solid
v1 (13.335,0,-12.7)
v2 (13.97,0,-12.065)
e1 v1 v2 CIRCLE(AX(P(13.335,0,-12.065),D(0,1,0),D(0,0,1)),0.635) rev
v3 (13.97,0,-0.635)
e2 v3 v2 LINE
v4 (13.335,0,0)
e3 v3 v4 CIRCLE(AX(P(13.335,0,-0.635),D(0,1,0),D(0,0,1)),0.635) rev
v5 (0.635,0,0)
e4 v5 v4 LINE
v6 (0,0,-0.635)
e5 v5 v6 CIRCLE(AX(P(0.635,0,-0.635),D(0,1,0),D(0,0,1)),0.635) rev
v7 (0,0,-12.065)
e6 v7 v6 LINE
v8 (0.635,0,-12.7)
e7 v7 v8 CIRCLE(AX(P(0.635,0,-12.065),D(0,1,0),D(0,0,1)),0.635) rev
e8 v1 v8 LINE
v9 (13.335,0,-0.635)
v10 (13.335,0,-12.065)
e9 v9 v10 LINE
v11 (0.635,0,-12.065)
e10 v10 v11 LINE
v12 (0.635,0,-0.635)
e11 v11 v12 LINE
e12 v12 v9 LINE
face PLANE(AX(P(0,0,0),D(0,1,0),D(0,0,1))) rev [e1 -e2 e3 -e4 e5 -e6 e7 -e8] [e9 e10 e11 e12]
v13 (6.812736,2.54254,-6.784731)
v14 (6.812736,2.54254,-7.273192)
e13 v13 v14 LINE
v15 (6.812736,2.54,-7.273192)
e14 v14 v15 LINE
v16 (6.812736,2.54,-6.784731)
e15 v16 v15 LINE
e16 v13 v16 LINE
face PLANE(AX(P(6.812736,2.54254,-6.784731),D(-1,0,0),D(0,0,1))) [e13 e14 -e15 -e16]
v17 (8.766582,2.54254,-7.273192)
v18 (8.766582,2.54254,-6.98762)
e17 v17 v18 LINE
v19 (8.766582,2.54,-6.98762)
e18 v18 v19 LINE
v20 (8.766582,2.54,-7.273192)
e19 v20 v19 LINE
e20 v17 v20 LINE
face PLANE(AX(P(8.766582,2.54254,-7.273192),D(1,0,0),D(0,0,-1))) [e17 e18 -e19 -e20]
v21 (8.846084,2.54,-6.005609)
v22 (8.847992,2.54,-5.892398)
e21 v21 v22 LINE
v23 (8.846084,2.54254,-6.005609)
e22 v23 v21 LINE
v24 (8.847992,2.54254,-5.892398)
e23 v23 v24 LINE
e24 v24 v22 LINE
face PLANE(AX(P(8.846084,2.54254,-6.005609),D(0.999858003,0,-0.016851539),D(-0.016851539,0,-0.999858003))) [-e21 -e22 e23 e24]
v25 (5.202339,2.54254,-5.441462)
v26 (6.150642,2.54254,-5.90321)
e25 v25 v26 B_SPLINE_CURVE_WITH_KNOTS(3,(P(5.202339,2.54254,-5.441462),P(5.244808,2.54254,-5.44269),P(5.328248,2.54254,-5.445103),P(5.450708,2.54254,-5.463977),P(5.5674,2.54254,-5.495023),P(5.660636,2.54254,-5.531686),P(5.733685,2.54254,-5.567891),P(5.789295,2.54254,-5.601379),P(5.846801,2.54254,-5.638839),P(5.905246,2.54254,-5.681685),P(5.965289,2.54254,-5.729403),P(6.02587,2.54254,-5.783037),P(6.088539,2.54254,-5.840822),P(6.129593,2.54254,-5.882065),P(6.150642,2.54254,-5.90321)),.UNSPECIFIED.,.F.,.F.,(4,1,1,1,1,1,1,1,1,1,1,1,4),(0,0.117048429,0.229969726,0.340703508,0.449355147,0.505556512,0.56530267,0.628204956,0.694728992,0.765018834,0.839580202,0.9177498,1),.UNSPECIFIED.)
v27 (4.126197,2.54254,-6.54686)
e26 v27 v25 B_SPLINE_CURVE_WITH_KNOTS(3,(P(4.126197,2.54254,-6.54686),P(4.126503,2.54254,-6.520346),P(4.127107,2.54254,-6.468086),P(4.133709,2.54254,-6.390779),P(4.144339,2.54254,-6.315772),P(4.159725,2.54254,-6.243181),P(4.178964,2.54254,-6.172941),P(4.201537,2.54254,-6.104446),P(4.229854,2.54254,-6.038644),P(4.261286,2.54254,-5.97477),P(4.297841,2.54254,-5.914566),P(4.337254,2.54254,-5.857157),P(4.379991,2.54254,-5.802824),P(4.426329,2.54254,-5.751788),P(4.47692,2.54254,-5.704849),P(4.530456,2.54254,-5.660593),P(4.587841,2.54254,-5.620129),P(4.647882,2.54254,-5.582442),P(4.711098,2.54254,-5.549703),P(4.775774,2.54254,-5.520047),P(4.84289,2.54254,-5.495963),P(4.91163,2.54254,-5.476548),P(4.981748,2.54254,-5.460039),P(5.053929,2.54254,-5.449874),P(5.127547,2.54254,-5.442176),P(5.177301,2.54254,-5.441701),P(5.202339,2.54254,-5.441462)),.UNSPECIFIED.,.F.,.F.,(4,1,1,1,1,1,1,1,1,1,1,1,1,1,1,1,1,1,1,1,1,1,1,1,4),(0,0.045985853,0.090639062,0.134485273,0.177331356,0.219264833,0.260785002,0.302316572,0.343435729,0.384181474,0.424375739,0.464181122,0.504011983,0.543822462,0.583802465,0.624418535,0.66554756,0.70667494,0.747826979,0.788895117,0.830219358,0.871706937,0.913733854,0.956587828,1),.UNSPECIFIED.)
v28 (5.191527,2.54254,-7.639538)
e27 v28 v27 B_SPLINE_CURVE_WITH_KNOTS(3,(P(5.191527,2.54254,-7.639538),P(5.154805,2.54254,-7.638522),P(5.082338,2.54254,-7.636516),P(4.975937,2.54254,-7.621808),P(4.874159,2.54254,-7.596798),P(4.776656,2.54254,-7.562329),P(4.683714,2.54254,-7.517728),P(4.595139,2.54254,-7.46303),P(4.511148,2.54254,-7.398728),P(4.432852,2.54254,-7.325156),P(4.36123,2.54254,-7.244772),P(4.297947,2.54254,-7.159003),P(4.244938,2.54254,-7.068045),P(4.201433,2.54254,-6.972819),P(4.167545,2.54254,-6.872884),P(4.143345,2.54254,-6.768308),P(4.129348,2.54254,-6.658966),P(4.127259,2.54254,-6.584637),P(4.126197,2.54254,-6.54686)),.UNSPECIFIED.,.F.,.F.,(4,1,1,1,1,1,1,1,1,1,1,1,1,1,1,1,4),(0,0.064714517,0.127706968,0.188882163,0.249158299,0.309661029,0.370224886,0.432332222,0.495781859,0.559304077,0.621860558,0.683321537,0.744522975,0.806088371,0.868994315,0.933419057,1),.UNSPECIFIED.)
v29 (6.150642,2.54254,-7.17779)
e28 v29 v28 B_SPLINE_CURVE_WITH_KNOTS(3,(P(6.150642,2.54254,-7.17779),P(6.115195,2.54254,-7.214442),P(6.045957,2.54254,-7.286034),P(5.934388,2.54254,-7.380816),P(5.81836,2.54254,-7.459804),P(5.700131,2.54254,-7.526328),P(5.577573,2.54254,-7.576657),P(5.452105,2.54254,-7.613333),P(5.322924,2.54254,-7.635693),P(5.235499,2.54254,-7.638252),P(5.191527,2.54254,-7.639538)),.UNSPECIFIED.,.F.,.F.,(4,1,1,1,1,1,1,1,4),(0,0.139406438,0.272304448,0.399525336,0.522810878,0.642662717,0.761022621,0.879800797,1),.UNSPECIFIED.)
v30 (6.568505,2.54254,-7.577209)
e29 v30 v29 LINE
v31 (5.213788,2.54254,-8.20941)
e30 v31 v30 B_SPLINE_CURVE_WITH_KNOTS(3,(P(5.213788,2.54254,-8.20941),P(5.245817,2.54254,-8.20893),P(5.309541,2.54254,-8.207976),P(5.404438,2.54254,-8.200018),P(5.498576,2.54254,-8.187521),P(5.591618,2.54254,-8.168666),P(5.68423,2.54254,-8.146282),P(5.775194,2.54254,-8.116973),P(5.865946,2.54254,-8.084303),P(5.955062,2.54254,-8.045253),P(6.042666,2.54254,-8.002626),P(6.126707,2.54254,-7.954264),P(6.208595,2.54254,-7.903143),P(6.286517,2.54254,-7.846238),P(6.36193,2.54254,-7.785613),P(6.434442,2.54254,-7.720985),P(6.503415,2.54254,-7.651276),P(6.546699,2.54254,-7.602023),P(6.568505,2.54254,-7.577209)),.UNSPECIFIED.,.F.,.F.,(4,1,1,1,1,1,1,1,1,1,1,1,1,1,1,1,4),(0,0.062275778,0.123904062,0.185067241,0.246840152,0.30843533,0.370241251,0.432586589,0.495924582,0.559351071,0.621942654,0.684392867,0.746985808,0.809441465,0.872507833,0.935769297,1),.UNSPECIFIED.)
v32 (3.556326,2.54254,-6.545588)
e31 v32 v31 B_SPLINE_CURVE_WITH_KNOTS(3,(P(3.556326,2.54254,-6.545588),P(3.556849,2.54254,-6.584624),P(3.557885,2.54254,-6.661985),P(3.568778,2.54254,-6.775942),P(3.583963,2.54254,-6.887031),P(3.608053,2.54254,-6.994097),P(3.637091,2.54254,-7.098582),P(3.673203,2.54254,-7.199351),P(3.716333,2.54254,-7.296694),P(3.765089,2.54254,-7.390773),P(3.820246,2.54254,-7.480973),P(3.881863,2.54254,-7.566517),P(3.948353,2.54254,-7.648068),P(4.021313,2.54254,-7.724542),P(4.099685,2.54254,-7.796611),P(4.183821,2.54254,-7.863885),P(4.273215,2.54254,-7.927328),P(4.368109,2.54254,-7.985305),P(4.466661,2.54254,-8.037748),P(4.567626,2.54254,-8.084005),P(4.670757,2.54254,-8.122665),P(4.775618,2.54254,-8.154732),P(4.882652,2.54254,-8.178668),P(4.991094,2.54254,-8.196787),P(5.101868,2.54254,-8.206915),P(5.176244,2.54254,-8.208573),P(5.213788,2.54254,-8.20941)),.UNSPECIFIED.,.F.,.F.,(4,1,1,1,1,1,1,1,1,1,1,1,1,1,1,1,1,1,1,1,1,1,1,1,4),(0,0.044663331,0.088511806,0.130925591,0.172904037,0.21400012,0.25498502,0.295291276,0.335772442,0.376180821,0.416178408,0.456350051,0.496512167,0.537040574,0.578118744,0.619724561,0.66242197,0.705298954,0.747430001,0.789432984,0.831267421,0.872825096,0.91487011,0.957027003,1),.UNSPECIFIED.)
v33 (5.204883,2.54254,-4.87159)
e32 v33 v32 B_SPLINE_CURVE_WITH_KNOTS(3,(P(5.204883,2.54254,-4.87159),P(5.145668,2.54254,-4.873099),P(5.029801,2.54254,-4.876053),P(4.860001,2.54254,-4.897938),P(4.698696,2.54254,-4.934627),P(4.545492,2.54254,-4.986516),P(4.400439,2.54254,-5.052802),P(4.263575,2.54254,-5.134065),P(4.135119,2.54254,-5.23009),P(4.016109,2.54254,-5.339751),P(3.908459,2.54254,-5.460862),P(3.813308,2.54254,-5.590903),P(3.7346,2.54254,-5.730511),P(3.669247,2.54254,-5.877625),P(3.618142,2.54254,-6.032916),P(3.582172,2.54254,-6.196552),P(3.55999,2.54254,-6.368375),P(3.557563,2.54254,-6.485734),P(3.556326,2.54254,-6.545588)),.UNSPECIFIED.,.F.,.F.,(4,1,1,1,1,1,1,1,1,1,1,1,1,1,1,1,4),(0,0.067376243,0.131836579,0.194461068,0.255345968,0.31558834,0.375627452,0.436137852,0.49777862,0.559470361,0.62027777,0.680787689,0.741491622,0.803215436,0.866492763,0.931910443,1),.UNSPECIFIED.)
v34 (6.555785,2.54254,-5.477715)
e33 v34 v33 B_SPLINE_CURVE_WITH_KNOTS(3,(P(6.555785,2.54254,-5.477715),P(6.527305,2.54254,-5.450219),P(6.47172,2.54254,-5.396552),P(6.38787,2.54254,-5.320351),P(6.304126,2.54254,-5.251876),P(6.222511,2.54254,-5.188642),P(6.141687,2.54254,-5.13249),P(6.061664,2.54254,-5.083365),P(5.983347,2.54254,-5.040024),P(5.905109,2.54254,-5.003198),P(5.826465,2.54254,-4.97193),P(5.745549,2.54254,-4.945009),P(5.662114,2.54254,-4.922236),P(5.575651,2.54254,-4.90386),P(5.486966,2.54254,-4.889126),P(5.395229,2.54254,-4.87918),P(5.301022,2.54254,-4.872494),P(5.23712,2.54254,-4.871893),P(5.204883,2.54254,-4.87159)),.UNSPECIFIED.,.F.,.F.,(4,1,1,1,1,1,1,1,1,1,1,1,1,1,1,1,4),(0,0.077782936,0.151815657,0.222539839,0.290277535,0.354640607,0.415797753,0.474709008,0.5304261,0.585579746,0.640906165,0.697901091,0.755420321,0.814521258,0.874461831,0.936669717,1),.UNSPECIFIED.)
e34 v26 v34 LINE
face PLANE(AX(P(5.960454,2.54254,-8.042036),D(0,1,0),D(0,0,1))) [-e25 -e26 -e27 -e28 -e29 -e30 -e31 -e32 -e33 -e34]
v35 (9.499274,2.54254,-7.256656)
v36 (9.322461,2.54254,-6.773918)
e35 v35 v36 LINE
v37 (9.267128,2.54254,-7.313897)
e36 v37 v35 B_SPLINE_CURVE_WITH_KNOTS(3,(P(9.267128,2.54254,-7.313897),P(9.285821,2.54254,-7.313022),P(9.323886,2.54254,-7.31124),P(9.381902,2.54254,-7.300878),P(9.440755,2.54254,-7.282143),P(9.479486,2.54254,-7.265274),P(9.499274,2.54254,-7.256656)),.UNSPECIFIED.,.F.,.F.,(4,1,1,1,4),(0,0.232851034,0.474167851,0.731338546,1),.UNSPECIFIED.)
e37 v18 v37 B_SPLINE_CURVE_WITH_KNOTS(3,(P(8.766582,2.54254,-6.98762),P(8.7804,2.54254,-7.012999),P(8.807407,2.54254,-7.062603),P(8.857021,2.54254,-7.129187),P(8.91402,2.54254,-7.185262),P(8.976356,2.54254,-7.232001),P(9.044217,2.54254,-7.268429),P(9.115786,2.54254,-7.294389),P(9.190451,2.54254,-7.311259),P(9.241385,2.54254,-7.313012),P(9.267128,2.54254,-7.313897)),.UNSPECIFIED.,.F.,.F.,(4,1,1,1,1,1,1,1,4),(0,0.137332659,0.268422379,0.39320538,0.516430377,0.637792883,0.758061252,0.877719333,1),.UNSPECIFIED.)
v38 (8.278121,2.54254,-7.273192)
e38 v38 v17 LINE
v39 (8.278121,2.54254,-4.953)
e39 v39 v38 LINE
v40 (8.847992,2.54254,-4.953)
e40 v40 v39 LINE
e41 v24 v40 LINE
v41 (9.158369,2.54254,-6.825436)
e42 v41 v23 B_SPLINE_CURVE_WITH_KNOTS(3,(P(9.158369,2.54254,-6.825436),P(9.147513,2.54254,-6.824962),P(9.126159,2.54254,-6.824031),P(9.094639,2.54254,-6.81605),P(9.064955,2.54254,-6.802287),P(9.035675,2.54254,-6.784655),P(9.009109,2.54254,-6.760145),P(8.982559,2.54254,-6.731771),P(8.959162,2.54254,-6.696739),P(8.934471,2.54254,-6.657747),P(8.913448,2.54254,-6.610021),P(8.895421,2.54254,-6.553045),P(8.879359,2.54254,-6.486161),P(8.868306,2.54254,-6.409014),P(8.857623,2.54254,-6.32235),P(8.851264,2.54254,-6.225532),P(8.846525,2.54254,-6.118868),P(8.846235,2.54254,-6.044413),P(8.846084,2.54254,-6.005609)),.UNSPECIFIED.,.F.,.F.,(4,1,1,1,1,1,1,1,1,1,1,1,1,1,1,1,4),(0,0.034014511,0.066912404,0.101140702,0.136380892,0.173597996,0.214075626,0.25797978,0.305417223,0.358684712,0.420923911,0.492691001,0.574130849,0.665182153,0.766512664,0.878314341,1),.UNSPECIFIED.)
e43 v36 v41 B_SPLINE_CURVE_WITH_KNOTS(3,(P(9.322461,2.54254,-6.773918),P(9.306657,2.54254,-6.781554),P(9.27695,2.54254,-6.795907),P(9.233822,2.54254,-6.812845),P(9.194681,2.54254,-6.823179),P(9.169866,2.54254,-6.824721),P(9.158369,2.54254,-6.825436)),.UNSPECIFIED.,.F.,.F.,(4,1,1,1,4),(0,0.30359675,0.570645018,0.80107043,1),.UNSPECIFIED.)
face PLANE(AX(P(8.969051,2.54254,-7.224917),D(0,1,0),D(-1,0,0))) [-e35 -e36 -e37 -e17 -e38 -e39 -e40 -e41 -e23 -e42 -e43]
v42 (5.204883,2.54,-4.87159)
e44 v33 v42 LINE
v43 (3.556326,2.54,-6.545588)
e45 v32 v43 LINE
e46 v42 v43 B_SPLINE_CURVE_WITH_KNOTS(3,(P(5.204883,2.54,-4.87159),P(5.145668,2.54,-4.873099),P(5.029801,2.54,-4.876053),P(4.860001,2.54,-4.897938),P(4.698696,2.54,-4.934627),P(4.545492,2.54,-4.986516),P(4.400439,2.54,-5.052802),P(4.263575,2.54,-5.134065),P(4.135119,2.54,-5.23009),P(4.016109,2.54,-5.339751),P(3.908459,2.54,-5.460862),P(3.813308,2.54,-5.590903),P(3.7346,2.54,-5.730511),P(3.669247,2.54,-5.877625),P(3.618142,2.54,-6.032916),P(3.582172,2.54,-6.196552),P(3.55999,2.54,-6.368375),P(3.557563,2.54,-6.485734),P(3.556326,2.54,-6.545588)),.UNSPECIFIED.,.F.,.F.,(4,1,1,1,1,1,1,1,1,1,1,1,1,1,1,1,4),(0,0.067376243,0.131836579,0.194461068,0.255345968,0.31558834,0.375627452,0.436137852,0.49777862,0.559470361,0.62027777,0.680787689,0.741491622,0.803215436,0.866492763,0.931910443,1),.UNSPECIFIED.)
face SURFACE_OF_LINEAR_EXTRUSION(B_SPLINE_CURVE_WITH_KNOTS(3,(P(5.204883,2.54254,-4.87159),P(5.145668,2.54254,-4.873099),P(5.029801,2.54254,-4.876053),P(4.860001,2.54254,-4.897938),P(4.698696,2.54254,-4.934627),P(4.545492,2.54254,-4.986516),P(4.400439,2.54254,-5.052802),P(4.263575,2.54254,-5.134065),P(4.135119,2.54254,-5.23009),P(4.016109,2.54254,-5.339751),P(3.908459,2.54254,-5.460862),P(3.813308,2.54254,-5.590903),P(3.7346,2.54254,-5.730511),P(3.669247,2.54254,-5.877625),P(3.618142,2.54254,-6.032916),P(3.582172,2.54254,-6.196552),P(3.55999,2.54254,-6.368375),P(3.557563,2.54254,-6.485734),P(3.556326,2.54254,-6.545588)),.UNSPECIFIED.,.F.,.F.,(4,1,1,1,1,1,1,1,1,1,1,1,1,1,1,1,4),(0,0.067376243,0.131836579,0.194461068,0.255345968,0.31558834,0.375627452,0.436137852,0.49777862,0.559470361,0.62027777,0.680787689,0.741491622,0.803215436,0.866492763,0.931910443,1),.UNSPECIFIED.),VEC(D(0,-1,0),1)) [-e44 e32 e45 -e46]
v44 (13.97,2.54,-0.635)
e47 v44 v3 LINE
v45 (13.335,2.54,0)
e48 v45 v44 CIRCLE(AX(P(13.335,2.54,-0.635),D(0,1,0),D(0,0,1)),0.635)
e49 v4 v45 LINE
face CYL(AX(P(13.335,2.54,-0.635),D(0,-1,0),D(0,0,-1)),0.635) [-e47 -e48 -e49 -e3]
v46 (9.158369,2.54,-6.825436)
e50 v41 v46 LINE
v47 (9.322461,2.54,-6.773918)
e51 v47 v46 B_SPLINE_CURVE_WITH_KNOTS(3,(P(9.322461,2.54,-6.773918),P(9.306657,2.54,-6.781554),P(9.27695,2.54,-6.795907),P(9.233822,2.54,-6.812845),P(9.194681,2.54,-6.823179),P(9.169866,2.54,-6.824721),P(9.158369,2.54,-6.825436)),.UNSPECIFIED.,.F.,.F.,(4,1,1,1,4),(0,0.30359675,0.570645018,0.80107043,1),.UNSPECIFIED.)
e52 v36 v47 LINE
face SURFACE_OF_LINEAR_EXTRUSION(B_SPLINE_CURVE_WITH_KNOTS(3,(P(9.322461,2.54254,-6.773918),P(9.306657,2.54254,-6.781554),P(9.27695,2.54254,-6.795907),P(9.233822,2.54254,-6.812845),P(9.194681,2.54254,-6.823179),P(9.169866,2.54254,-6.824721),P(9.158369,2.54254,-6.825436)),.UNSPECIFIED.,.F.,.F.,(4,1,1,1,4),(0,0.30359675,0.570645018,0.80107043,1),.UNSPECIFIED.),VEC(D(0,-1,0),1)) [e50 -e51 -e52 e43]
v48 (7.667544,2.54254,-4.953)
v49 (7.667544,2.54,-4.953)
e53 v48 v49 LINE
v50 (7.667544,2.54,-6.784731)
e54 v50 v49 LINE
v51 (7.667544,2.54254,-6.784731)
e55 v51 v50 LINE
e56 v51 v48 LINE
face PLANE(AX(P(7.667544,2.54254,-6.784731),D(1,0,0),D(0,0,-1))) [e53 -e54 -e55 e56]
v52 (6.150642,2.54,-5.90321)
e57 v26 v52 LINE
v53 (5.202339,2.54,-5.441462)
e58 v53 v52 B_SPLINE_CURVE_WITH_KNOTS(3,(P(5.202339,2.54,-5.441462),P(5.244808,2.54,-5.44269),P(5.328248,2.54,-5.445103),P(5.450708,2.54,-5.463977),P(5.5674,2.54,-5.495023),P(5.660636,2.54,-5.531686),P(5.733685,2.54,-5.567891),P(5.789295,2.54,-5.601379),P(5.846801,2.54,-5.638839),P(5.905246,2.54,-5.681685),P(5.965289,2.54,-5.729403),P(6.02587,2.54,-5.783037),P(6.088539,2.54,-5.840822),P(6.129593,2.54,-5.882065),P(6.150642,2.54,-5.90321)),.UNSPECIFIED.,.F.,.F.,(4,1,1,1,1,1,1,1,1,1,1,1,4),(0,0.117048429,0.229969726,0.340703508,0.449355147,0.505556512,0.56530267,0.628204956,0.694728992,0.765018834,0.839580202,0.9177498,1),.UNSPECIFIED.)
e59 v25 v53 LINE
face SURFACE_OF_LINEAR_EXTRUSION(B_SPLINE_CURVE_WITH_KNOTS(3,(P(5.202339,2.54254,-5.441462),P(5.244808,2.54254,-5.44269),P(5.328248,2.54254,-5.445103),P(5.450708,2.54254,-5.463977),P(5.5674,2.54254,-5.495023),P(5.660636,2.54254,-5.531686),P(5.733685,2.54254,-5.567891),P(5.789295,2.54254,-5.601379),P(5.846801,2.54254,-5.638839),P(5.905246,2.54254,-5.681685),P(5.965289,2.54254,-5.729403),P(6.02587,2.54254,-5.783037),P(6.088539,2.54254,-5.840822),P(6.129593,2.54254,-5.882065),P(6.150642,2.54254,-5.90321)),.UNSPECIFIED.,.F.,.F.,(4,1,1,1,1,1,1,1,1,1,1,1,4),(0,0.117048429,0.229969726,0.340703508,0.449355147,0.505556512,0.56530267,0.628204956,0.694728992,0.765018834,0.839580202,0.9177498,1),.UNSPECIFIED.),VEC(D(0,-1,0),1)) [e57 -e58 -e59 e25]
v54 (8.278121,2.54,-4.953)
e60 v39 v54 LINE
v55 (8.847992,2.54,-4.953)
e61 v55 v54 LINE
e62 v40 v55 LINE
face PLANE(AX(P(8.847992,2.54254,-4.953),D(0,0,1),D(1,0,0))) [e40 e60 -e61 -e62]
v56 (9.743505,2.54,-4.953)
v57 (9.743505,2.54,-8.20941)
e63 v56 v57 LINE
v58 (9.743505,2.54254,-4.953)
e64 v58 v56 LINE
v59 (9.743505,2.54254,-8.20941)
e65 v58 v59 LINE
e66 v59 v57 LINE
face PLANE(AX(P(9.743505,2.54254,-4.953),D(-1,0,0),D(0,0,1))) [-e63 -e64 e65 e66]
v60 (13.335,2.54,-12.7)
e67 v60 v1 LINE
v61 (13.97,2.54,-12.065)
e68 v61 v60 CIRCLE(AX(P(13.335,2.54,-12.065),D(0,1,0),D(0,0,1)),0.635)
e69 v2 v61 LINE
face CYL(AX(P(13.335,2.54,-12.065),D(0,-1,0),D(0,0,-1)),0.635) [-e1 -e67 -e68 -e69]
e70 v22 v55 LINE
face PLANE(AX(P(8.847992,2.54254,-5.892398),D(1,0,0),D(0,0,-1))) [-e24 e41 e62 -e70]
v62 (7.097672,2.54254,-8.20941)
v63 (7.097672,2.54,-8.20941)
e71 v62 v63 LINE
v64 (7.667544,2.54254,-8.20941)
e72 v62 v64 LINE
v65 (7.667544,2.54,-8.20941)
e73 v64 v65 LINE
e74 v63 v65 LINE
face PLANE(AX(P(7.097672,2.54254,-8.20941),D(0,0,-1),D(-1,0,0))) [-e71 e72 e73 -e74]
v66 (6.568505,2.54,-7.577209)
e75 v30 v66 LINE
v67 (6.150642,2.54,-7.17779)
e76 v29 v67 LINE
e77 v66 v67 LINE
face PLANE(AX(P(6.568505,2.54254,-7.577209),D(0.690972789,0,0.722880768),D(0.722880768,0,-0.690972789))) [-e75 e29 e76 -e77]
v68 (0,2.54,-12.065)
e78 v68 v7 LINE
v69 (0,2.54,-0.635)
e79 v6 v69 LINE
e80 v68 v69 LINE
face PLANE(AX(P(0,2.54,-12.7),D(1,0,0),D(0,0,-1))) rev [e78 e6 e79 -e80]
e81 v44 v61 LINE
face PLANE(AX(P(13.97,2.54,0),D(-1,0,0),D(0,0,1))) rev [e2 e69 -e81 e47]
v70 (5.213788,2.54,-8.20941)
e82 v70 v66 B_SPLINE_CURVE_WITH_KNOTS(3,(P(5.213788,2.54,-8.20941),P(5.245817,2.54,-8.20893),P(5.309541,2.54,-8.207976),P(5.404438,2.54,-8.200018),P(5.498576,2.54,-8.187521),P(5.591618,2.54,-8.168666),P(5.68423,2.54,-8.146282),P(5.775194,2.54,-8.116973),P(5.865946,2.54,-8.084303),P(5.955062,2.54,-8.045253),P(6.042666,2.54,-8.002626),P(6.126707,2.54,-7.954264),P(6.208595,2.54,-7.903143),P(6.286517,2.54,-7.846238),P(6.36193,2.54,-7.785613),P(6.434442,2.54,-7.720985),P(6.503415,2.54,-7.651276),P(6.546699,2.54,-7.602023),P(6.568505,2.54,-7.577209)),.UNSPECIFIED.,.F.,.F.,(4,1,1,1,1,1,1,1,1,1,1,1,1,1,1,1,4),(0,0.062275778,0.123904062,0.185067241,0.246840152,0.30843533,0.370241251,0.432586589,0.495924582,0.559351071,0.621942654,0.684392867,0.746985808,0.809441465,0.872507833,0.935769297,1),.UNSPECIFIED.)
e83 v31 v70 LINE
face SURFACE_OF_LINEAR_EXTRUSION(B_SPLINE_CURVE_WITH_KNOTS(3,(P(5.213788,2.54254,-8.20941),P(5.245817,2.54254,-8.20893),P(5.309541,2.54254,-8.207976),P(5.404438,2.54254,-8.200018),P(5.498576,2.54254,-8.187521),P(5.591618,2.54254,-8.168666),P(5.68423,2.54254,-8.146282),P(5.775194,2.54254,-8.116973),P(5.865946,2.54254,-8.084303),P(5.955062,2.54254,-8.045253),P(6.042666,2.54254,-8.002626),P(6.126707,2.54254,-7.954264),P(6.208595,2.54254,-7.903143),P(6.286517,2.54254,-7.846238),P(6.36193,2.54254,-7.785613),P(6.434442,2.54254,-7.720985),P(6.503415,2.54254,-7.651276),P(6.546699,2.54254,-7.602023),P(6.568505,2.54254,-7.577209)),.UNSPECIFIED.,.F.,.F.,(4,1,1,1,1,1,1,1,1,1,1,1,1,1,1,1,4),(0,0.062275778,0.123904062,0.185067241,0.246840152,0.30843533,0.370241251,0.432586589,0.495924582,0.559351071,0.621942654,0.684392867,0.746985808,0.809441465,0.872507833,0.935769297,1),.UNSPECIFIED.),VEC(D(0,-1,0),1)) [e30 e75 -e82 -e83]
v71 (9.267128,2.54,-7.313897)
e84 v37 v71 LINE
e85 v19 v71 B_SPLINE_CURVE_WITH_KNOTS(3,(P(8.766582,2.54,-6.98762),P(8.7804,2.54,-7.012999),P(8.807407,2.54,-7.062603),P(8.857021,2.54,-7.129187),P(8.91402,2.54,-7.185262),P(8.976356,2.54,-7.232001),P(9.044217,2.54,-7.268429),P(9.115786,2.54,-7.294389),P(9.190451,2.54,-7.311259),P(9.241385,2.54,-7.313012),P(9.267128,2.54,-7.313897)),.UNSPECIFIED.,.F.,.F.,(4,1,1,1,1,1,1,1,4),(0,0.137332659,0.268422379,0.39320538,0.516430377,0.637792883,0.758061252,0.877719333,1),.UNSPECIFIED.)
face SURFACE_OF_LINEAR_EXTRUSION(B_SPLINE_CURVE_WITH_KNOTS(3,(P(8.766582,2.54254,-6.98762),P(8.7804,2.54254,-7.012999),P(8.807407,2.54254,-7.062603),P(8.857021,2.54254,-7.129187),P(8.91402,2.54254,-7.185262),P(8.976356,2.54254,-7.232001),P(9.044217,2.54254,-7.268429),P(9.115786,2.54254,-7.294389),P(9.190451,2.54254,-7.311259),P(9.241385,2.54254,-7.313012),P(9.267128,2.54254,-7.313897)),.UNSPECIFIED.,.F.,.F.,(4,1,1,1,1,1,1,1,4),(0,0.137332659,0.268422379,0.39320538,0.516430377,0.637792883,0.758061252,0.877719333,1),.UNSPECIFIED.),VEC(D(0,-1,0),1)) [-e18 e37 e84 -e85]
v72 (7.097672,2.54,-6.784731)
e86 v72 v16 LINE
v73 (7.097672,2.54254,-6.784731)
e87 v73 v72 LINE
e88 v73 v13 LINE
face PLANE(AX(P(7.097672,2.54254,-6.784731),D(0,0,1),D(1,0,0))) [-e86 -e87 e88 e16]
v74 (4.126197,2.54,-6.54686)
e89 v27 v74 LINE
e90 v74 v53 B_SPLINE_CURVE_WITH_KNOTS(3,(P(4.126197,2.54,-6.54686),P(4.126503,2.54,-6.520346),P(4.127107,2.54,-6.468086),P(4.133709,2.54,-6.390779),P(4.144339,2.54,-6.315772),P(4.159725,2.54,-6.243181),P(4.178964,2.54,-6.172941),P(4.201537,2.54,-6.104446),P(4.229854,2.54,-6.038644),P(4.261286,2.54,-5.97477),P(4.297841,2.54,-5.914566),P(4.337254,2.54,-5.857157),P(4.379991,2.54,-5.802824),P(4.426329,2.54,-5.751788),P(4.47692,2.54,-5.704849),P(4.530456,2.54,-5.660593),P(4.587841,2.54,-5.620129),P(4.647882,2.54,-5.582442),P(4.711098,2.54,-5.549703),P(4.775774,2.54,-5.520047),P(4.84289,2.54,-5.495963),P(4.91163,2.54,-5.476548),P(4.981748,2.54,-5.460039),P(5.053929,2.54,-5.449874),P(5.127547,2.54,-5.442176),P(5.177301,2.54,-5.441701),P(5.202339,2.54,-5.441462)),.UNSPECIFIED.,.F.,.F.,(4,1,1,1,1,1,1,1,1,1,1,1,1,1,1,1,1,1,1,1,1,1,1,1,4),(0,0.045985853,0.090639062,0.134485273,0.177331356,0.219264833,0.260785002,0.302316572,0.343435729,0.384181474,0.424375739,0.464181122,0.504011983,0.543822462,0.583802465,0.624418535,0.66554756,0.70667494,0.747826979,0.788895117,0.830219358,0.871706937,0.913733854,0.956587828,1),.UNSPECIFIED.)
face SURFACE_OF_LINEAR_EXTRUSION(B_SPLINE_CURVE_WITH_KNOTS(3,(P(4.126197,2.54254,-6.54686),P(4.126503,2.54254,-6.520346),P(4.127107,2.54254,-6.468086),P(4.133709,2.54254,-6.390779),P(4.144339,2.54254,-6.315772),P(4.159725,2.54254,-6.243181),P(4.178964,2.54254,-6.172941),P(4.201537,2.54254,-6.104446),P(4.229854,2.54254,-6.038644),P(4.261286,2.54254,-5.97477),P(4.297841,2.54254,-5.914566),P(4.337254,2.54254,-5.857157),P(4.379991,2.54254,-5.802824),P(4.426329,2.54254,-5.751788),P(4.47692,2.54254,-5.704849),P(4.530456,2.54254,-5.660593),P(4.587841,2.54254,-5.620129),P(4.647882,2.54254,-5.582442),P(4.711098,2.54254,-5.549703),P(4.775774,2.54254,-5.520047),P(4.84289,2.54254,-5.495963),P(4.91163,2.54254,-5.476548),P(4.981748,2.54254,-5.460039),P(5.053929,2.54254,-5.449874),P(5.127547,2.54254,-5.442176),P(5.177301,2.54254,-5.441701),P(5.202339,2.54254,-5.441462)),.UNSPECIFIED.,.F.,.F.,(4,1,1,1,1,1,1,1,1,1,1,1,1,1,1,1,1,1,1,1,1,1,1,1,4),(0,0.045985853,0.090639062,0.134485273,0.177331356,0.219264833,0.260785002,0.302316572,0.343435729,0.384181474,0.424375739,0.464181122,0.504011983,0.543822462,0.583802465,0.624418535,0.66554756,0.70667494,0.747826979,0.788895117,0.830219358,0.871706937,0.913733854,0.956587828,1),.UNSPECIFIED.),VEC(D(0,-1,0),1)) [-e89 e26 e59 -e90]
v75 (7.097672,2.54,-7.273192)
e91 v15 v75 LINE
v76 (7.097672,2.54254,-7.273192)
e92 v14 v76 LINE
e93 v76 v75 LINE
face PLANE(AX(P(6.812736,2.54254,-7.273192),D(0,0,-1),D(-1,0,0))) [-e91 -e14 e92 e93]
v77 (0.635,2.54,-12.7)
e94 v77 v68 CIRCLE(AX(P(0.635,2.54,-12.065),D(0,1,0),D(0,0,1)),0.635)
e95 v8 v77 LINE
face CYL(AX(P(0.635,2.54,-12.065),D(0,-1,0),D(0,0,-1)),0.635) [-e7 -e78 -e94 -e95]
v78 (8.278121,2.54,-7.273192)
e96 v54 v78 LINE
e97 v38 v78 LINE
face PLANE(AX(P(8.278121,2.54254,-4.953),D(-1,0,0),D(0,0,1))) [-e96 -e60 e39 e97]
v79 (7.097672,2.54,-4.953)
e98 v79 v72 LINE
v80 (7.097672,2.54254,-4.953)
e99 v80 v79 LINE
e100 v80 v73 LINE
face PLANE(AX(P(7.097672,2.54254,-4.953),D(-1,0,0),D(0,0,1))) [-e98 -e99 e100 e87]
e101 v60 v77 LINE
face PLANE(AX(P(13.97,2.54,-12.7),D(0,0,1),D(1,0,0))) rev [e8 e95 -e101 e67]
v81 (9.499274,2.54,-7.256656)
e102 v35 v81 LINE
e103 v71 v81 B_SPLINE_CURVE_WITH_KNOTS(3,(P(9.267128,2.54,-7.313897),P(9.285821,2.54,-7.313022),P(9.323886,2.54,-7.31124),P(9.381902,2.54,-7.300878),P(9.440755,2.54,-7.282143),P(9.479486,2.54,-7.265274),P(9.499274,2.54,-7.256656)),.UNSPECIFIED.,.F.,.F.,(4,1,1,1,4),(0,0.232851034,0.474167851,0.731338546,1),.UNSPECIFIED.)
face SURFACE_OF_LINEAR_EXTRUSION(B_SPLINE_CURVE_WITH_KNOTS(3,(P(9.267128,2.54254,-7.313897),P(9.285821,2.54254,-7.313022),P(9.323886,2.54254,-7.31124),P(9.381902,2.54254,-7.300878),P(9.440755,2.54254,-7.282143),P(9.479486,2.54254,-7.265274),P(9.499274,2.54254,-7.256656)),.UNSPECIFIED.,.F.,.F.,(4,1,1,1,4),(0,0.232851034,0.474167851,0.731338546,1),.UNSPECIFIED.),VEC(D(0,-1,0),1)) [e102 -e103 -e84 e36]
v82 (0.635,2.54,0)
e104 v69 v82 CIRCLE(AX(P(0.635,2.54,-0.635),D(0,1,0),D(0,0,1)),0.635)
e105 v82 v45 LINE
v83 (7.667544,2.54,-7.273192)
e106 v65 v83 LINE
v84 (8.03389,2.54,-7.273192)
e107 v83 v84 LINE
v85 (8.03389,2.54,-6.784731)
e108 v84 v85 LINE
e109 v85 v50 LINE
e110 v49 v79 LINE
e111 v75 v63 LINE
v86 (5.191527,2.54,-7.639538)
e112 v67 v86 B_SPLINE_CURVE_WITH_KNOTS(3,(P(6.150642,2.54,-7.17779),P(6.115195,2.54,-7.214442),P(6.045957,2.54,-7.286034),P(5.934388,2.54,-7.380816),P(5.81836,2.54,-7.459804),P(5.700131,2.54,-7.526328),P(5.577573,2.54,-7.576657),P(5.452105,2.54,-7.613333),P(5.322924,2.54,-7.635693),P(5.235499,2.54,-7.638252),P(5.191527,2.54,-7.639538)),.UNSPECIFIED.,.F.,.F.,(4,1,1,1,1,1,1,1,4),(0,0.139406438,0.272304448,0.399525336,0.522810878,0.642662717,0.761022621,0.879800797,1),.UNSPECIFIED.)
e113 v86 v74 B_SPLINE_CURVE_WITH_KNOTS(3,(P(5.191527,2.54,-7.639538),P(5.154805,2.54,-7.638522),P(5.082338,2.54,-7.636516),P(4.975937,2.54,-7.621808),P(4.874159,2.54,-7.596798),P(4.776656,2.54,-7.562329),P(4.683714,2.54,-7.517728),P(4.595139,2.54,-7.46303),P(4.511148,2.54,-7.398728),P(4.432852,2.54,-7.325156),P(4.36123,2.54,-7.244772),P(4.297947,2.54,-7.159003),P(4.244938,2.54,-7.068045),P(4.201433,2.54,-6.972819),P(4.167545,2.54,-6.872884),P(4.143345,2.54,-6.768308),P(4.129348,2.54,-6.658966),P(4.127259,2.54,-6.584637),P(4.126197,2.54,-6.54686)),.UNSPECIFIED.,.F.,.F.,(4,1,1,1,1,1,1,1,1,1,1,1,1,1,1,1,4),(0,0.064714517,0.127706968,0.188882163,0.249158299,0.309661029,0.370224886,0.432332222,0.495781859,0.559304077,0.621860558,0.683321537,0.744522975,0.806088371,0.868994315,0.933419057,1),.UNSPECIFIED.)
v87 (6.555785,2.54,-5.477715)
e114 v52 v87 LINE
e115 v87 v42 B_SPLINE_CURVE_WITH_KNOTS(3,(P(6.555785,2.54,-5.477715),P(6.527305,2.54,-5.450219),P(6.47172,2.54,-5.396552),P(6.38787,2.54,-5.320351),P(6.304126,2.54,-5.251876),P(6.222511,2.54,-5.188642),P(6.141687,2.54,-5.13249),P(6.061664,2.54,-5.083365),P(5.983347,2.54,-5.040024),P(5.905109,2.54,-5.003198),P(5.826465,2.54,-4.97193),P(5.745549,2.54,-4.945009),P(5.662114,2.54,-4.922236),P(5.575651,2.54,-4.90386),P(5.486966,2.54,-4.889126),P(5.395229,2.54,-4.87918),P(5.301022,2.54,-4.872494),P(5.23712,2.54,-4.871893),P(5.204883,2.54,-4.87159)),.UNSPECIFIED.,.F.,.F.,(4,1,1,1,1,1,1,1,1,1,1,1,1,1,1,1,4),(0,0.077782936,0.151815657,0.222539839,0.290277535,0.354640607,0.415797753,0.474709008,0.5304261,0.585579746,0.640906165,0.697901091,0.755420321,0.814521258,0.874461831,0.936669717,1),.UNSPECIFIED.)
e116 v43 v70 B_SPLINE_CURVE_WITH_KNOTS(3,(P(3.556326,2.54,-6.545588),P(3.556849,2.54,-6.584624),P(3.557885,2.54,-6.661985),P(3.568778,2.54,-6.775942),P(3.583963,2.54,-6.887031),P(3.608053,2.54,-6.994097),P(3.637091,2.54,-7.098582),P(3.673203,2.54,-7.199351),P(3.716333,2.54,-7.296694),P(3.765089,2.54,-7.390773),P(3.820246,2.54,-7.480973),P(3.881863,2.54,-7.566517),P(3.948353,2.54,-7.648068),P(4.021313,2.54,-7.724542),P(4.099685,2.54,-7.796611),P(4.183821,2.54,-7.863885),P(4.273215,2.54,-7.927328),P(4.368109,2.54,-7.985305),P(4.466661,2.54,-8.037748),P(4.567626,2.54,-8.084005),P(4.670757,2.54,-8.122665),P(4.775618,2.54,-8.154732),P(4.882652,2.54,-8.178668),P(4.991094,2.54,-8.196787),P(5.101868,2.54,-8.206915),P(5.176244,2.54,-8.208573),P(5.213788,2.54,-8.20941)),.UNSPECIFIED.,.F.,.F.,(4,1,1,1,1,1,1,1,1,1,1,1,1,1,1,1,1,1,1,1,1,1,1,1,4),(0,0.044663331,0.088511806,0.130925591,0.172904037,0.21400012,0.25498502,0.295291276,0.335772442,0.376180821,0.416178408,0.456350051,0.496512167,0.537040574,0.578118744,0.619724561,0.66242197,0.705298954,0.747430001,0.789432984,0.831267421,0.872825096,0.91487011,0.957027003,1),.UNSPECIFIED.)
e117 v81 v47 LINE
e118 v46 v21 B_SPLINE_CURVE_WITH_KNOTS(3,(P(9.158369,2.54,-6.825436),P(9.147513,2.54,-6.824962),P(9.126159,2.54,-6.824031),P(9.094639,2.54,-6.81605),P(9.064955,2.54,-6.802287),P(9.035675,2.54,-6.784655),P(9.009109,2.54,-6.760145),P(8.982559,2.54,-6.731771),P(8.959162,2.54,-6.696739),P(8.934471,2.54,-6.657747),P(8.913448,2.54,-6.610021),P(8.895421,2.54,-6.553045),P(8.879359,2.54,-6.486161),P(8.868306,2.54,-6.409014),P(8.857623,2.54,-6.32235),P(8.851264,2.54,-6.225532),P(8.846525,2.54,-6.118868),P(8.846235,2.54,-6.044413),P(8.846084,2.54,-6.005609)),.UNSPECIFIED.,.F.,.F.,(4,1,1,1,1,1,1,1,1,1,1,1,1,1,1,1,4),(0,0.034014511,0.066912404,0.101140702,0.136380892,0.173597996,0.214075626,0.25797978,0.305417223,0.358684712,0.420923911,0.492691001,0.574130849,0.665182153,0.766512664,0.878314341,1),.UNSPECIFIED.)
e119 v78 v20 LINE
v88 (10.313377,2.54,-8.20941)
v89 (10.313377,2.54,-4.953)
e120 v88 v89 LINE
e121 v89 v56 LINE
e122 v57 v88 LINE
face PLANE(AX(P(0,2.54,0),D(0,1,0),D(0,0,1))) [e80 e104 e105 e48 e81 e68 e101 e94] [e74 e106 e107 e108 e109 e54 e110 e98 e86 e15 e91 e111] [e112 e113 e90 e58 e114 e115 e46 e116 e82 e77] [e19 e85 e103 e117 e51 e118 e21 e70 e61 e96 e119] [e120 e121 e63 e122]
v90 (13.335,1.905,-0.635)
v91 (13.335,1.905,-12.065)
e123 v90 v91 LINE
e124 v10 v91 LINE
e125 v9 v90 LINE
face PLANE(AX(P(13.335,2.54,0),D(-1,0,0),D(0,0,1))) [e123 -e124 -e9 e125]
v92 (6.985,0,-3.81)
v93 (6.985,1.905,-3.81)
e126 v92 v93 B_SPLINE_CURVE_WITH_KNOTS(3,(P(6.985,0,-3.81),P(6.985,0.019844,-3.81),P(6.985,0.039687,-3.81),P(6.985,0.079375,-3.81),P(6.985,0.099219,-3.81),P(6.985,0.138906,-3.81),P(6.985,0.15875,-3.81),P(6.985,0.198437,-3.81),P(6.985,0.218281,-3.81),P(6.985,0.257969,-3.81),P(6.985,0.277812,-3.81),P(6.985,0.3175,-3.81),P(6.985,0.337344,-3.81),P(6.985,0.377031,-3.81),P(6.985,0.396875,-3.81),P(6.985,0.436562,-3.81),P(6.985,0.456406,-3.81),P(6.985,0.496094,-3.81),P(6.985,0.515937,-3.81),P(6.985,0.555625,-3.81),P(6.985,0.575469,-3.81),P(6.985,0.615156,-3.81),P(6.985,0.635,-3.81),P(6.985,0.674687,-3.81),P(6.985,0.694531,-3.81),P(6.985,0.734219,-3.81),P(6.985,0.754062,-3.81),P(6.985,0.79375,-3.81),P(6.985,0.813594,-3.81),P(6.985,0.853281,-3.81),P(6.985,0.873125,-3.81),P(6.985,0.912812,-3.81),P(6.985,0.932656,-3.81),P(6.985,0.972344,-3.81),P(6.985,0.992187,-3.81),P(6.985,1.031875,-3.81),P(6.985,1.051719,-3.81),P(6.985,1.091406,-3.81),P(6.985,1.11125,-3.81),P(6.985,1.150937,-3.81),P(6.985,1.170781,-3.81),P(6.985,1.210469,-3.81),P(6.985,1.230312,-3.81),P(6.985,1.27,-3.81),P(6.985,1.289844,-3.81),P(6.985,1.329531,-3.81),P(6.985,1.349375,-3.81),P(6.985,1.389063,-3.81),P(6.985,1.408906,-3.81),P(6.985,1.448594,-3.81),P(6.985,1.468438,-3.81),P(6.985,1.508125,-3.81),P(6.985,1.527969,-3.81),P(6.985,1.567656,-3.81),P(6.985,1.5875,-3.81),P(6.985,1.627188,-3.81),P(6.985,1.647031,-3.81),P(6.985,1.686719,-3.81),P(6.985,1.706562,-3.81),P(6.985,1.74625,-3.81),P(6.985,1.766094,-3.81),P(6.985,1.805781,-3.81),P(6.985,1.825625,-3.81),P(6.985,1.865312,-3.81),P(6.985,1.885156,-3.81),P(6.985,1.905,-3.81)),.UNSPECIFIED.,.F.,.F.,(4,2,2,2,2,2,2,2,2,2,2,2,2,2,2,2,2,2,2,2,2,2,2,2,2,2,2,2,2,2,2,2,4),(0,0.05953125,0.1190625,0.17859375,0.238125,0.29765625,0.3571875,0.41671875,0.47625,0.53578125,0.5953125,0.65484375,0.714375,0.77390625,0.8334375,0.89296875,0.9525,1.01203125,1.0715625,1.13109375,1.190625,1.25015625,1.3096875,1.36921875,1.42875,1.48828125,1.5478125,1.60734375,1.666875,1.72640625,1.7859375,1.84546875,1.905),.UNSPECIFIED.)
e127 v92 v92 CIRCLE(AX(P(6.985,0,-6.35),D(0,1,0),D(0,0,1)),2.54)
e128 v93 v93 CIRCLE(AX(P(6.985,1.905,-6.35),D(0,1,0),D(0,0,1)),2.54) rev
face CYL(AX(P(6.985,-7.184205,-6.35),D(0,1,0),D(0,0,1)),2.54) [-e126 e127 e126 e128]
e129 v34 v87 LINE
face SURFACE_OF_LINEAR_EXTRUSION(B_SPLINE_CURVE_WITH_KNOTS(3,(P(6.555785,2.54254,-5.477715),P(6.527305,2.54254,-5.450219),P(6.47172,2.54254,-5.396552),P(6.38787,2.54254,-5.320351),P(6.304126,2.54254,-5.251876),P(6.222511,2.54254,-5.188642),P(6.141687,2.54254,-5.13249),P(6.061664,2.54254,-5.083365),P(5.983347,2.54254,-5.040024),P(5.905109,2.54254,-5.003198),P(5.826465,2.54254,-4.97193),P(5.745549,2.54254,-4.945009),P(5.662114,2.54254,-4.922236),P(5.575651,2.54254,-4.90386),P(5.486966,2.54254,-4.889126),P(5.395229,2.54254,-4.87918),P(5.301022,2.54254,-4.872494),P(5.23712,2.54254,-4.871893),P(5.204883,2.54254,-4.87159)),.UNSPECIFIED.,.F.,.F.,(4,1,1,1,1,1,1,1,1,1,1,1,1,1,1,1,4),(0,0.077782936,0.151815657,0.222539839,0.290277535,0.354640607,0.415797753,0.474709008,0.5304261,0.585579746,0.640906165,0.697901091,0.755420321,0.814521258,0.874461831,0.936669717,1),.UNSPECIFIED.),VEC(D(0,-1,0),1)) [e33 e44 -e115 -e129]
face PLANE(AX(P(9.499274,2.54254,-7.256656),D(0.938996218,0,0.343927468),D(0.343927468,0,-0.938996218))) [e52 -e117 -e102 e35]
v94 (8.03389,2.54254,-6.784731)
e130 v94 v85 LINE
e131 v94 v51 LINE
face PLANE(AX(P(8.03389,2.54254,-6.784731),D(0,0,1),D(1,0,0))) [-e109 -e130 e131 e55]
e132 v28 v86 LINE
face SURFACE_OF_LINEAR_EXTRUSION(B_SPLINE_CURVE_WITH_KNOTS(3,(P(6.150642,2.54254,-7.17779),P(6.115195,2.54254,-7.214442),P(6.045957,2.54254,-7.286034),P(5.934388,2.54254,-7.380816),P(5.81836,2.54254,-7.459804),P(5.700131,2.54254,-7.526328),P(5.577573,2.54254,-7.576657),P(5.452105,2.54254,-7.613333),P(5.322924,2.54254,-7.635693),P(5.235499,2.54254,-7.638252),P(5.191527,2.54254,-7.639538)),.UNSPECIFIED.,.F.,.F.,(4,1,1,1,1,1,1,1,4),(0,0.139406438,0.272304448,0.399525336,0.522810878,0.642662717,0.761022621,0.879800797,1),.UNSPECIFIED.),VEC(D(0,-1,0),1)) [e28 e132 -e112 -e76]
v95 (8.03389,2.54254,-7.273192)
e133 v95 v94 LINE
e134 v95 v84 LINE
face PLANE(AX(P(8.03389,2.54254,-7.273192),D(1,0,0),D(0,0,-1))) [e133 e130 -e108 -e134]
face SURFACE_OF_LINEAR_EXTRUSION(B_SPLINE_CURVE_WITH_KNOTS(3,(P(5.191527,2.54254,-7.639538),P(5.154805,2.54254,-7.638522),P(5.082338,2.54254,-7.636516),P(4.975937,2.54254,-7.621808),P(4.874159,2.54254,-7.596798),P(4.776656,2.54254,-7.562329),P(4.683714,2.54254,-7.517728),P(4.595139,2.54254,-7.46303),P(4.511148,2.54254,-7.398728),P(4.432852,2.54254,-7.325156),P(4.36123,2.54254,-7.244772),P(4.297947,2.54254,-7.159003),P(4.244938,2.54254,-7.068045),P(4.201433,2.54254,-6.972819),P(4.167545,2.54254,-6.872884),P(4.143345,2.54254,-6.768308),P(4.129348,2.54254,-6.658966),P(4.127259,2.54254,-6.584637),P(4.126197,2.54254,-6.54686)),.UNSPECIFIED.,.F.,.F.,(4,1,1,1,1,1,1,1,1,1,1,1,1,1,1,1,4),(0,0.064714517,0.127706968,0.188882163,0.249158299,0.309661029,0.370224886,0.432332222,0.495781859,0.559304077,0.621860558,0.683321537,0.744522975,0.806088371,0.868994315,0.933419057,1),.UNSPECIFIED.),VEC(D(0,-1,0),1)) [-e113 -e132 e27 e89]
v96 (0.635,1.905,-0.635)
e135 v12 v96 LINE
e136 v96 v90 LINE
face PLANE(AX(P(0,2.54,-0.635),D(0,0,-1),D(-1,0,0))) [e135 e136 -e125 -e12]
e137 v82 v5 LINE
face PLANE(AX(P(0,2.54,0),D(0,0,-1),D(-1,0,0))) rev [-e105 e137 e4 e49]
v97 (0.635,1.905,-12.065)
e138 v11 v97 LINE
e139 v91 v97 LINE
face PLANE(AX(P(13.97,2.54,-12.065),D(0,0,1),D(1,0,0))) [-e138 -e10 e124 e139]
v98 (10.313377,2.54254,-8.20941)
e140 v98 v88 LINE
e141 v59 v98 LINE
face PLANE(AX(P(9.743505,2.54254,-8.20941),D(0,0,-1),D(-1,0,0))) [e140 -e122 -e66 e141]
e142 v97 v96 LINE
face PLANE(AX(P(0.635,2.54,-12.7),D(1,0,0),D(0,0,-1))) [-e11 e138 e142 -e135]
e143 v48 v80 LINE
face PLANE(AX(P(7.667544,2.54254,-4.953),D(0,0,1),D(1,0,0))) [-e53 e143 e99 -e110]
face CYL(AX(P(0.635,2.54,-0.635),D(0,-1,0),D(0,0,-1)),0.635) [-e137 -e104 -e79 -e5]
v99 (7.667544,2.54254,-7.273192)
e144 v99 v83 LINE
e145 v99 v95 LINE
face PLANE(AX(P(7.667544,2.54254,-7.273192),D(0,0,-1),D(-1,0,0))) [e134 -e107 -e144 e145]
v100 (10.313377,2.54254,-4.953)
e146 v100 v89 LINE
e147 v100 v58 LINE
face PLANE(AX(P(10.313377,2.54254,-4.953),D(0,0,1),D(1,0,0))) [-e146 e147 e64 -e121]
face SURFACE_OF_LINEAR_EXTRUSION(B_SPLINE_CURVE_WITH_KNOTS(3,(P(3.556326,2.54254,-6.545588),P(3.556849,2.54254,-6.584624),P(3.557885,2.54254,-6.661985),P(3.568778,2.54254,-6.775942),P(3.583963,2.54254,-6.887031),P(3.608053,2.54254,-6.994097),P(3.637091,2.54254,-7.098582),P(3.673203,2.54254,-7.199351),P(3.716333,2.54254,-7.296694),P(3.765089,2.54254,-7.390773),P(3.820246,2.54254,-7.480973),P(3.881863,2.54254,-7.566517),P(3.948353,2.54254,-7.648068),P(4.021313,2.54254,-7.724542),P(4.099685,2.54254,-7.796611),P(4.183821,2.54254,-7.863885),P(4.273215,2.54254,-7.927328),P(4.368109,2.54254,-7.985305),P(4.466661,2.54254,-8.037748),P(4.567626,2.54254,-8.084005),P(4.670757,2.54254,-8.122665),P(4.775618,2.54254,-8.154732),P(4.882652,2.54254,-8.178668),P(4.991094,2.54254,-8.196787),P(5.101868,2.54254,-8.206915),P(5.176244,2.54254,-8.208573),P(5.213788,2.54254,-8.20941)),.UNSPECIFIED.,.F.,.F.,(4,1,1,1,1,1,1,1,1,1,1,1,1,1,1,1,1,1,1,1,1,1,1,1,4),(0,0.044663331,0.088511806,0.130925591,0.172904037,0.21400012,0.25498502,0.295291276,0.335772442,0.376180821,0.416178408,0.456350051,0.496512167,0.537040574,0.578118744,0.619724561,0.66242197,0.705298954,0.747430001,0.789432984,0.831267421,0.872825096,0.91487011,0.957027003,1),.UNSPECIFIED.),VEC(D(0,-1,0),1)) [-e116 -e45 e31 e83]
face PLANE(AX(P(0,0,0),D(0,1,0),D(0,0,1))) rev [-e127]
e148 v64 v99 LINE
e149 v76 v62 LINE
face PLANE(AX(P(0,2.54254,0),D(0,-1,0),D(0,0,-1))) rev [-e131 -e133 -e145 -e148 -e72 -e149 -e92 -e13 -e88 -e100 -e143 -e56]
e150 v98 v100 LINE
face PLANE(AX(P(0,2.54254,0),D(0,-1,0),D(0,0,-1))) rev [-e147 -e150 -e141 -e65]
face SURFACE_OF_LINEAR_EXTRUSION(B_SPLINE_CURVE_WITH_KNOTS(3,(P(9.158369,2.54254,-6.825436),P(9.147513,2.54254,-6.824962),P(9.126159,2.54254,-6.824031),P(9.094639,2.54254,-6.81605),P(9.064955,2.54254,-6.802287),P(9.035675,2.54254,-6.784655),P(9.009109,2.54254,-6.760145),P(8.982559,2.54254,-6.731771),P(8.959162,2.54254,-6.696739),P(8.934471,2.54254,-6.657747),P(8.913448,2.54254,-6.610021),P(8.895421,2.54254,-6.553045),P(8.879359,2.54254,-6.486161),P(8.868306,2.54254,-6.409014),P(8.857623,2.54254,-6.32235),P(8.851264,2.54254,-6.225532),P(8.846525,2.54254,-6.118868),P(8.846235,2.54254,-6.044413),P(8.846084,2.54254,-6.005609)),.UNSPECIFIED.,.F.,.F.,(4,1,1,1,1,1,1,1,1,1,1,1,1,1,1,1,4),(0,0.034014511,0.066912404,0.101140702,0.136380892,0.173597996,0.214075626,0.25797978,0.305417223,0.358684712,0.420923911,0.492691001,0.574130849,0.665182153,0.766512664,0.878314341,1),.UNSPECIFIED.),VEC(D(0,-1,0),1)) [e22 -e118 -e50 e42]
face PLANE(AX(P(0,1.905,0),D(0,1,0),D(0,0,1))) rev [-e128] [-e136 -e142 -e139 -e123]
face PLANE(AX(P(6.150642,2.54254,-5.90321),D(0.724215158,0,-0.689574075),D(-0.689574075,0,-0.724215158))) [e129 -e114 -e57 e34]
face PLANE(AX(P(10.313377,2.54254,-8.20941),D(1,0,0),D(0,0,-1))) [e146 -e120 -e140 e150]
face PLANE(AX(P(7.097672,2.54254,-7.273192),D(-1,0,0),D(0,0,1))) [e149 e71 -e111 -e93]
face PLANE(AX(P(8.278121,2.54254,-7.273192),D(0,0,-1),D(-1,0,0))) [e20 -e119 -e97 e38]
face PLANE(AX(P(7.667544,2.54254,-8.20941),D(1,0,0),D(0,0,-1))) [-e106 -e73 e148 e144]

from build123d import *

# Parameters (mm, degrees)
SKETCH1_W           = 13.97
SKETCH1_H           = 12.7
BOSS_EXTRUDE1_DEPTH = 2.54
FILLET1_R           = 0.635
SHELL1_START        = 0.635
SHELL1_OUTLINE_W    = 1.905
SHELL1_OUTLINE_H    = 11.43
SHELL1_DEPTH        = 12.7
SKETCH2_R           = 2.54
BOSS_EXTRUDE2_DEPTH = 1.905
SKETCH3_W           = 0.569871795
SKETCH3_H           = 3.256410256
BOSS_EXTRUDE3_DEPTH = 0.00254


# Read off the part's stored shape, not the designer's step: Shell1
with BuildPart() as part:
    # Sketch1 → Boss-Extrude1 (new body)
    with BuildSketch(Plane(origin=(0, 0, 0), x_dir=(1, 0, 0), z_dir=(0, 1, 0))):
        with Locations((6.985, 6.35)):
            Rectangle(SKETCH1_W, SKETCH1_H)
    extrude(amount=BOSS_EXTRUDE1_DEPTH)

    # Fillet1
    fillet1_edges = [part.edges().sort_by_distance(p)[0] for p in [
        (0, 1.27, -12.7),
        (13.97, 1.27, -12.7),
        (13.97, 1.27, 0),
        (0, 1.27, 0),
    ]]
    fillet(fillet1_edges, radius=FILLET1_R)

    # Shell1 outline → Shell1 (cut)
    with BuildSketch(Plane.YZ.offset(SHELL1_START)):
        with Locations((0.9525, -6.35)):
            Rectangle(SHELL1_OUTLINE_W, SHELL1_OUTLINE_H)
    extrude(amount=SHELL1_DEPTH, mode=Mode.SUBTRACT)

    # Sketch2 → Boss-Extrude2 (add)
    with BuildSketch(Plane(origin=(0, 1.905, 0), x_dir=(-1, 0, 0), z_dir=(0, -1, 0))):
        with Locations(Location((-6.985, 6.35, 0), (0, 0, 270))):
            Circle(SKETCH2_R)
    extrude(amount=BOSS_EXTRUDE2_DEPTH)

    # Sketch3 → Boss-Extrude3 (add)
    with BuildSketch(Plane(origin=(0, 2.54, 0), x_dir=(1, 0, 0), z_dir=(0, 1, 0))):
        with BuildLine():
            Line((6.568505128, 7.577208734), (6.150641546, 7.177789663))
            add(Edge.make_bspline(
                [(6.150641546, 7.177789663), (6.115194953, 7.2144415), (6.045956652, 7.28603402), (5.934387691, 7.380816208), (5.818360035, 7.459804336), (5.700130769, 7.526327635), (5.577573291, 7.576657252), (5.452104701, 7.613333291), (5.322923843, 7.635693286), (5.235499207, 7.638251666), (5.191526963, 7.639538462)],
                knots=[0, 0, 0, 0, 1.115251505, 2.178435587, 3.19620269, 4.182487026, 5.141301733, 6.088180966, 7.038406374, 8, 8, 8, 8], degree=3))
            add(Edge.make_bspline(
                [(5.191526963, 7.639538462), (5.154804796, 7.638521848), (5.082337645, 7.636515672), (4.975936877, 7.621808428), (4.874159044, 7.596798119), (4.776655743, 7.562329281), (4.683713883, 7.517728433), (4.5951386, 7.463030097), (4.511148271, 7.398728275), (4.432852361, 7.325155668), (4.361230014, 7.244772066), (4.29794711, 7.159002955), (4.244937527, 7.068044826), (4.201433425, 6.972818837), (4.16754541, 6.872884235), (4.143345111, 6.7683083), (4.129348304, 6.658966489), (4.127259187, 6.584636741), (4.126197436, 6.546860176)],
                knots=[0, 0, 0, 0, 1.035432265, 2.043311493, 3.022114605, 3.98653278, 4.95457646, 5.923598177, 6.917315552, 7.932509744, 8.948865224, 9.949768934, 10.933144597, 11.912367597, 12.897413939, 13.903909035, 14.934704909, 16, 16, 16, 16], degree=3))
            add(Edge.make_bspline(
                [(4.126197436, 6.546860176), (4.12650342, 6.52034594), (4.127106522, 6.468085836), (4.133708537, 6.390778637), (4.144339337, 6.315772378), (4.159724739, 6.243180674), (4.178964335, 6.172940615), (4.201536762, 6.104446244), (4.229853539, 6.038643999), (4.26128559, 5.974769629), (4.297840702, 5.914566028), (4.337253857, 5.857156898), (4.379990988, 5.802823652), (4.426328908, 5.751788408), (4.476919763, 5.704848731), (4.530455968, 5.660593089), (4.587840605, 5.620129351), (4.647881648, 5.582442035), (4.711097778, 5.549702743), (4.775773793, 5.52004727), (4.842890313, 5.495962616), (4.911630153, 5.476548188), (4.981747662, 5.460039117), (5.053928654, 5.449873974), (5.12754741, 5.442176031), (5.177301332, 5.441700728), (5.202339263, 5.441461538)],
                knots=[0, 0, 0, 0, 1.103660481, 2.175337485, 3.227646561, 4.255952547, 5.262355991, 6.258840057, 7.255597736, 8.242457506, 9.22035537, 10.185017736, 11.140346927, 12.096287581, 13.051739095, 14.01125915, 14.986044842, 15.97314143, 16.960198552, 17.947847494, 18.933482797, 19.925264591, 20.920966487, 21.929612487, 22.958107872, 24, 24, 24, 24], degree=3))
            add(Edge.make_bspline(
                [(5.202339263, 5.441461538), (5.244807897, 5.442689957), (5.328247719, 5.445103479), (5.450707656, 5.463976883), (5.567399775, 5.495022564), (5.66063622, 5.53168571), (5.733684512, 5.567891042), (5.789295097, 5.601379191), (5.846800776, 5.638839363), (5.905246429, 5.681685345), (5.965289454, 5.729402968), (6.025869952, 5.783037337), (6.088538796, 5.840822348), (6.129592535, 5.882064647), (6.150641546, 5.903210337)],
                knots=[0, 0, 0, 0, 1.404581149, 2.759636711, 4.088442092, 5.392261763, 6.066678138, 6.783632037, 7.538459478, 8.336747902, 9.180226004, 10.074962426, 11.012997595, 12, 12, 12, 12], degree=3))
            Line((6.150641546, 5.903210337), (6.555784776, 5.477714543))
            add(Edge.make_bspline(
                [(6.555784776, 5.477714543), (6.527305387, 5.450218588), (6.471719712, 5.396552363), (6.387870264, 5.320351332), (6.304126343, 5.251876235), (6.222511029, 5.188641725), (6.141687378, 5.132489979), (6.06166396, 5.083364915), (5.983346676, 5.04002409), (5.905109243, 5.003198427), (5.826464826, 4.971929614), (5.745548963, 4.945009219), (5.662114287, 4.922235533), (5.575651216, 4.903860159), (5.486966225, 4.88912559), (5.395229341, 4.879179841), (5.301022221, 4.872493645), (5.237120072, 4.871892834), (5.204883333, 4.871589744)],
                knots=[0, 0, 0, 0, 1.244526981, 2.429050516, 3.560637417, 4.644440555, 5.67424972, 6.652764056, 7.595344123, 8.486817594, 9.369275933, 10.254498637, 11.166417451, 12.086725134, 13.032340136, 13.991389299, 14.986715468, 16, 16, 16, 16], degree=3))
            add(Edge.make_bspline(
                [(5.204883333, 4.871589744), (5.145668437, 4.873099249), (5.029801344, 4.876052933), (4.86000114, 4.897937726), (4.698695505, 4.934627196), (4.545492012, 4.986516227), (4.400439375, 5.052802032), (4.263574704, 5.134065316), (4.135118595, 5.230090176), (4.016108719, 5.339751107), (3.908458622, 5.460862399), (3.813308403, 5.590902701), (3.734600139, 5.730511114), (3.669246971, 5.877625175), (3.618141653, 6.032916222), (3.582172173, 6.196552234), (3.559990057, 6.36837521), (3.557563302, 6.485734263), (3.556325641, 6.545588141)],
                knots=[0, 0, 0, 0, 1.078019885, 2.10938526, 3.111377082, 4.085535484, 5.04941344, 6.010039228, 6.978205633, 7.964457913, 8.951525778, 9.924444315, 10.892603023, 11.863865945, 12.85144698, 13.863884204, 14.910567087, 16, 16, 16, 16], degree=3))
            add(Edge.make_bspline(
                [(3.556325641, 6.545588141), (3.556848616, 6.58462433), (3.557885026, 6.661984515), (3.568777786, 6.775942336), (3.583962928, 6.887030827), (3.608052774, 6.994096523), (3.637090707, 7.098581794), (3.673203193, 7.199351009), (3.716332553, 7.296693788), (3.765088628, 7.390773089), (3.820245888, 7.480972592), (3.881862603, 7.56651734), (3.948352517, 7.648067724), (4.021313276, 7.724541827), (4.099684664, 7.796611105), (4.183820519, 7.863885002), (4.273214805, 7.927328301), (4.36810948, 7.985304953), (4.466660994, 8.037747916), (4.567626351, 8.08400485), (4.670757492, 8.122664994), (4.775618369, 8.154732158), (4.882652019, 8.178668028), (4.991094461, 8.19678671), (5.101868412, 8.206915169), (5.176243523, 8.208573262), (5.21378758, 8.209410256)],
                knots=[0, 0, 0, 0, 1.071919942, 2.124283339, 3.142214191, 4.149696895, 5.136002878, 6.119640489, 7.086990633, 8.058538607, 9.028339693, 9.988281803, 10.952401235, 11.916291999, 12.888973767, 13.874849856, 14.873389453, 15.898127285, 16.927174885, 17.938320013, 18.946391617, 19.950418109, 20.947802303, 21.956882652, 22.968648068, 24, 24, 24, 24], degree=3))
            add(Edge.make_bspline(
                [(5.21378758, 8.209410256), (5.24581651, 8.20893047), (5.309541359, 8.207975887), (5.404438353, 8.200018393), (5.498576405, 8.187521229), (5.591618472, 8.168665671), (5.684230086, 8.14628174), (5.775194226, 8.11697307), (5.865945903, 8.084303034), (5.955061809, 8.045252678), (6.042666337, 8.002625686), (6.126707215, 7.954263816), (6.20859548, 7.903143202), (6.286516537, 7.846238304), (6.361930016, 7.785613168), (6.434441572, 7.720984943), (6.503414876, 7.651276087), (6.546698691, 7.602022665), (6.568505128, 7.577208734)],
                knots=[0, 0, 0, 0, 0.996412454, 1.982464992, 2.961075852, 3.949442424, 4.934965278, 5.923860011, 6.921385422, 7.934793307, 8.949617135, 9.951082467, 10.950285876, 11.951772932, 12.951063433, 13.960125323, 14.972308753, 16, 16, 16, 16], degree=3))
        make_face()
        Polygon((7.097671795, 8.209410256), (7.66754359, 8.209410256), (7.66754359, 7.273192308), (8.033889744, 7.273192308), (8.033889744, 6.784730769), (7.66754359, 6.784730769), (7.66754359, 4.953), (7.097671795, 4.953), (7.097671795, 6.784730769), (6.812735897, 6.784730769), (6.812735897, 7.273192308), (7.097671795, 7.273192308), align=None)
        with BuildLine():
            Line((8.278120513, 7.273192308), (8.766582051, 7.273192308))
            Line((8.766582051, 7.273192308), (8.766582051, 6.987620393))
            add(Edge.make_bspline(
                [(8.766582051, 6.987620393), (8.78039969, 7.012999247), (8.80740684, 7.062603272), (8.857021237, 7.129186851), (8.914020267, 7.185261684), (8.976355778, 7.232000626), (9.044216695, 7.268429043), (9.115785825, 7.294388882), (9.190450896, 7.31125918), (9.241384876, 7.313011685), (9.267127925, 7.313897436)],
                knots=[0, 0, 0, 0, 1.09866127, 2.147379032, 3.14564304, 4.131443017, 5.102343063, 6.064490016, 7.021754664, 8, 8, 8, 8], degree=3))
            add(Edge.make_bspline(
                [(9.267127925, 7.313897436), (9.28582059, 7.313022129), (9.323885533, 7.311239691), (9.381901861, 7.300878355), (9.440755263, 7.282143087), (9.479485873, 7.265274469), (9.499274359, 7.256655849)],
                knots=[0, 0, 0, 0, 0.931404136, 1.896671404, 2.925354185, 4, 4, 4, 4], degree=3))
            Line((9.499274359, 7.256655849), (9.322461458, 6.77391847))
            add(Edge.make_bspline(
                [(9.322461458, 6.77391847), (9.30665691, 6.781554463), (9.276950443, 6.795907192), (9.233821811, 6.81284489), (9.194680789, 6.823179446), (9.1698661, 6.824721452), (9.15836891, 6.825435897)],
                knots=[0, 0, 0, 0, 1.214386998, 2.282580073, 3.20428172, 4, 4, 4, 4], degree=3))
            add(Edge.make_bspline(
                [(9.15836891, 6.825435897), (9.147513328, 6.824962468), (9.126158527, 6.824031151), (9.094639437, 6.816050083), (9.064955019, 6.802286977), (9.035674781, 6.784655073), (9.009108609, 6.760145407), (8.982558846, 6.731771118), (8.959161774, 6.696739283), (8.934471077, 6.657747072), (8.913447831, 6.610020641), (8.895421046, 6.553045117), (8.879359035, 6.486161255), (8.868306178, 6.409013934), (8.857623149, 6.322349687), (8.851264348, 6.225532411), (8.846525052, 6.118868249), (8.846235276, 6.044412815), (8.846084255, 6.005609175)],
                knots=[0, 0, 0, 0, 0.544232178, 1.070598461, 1.618251235, 2.182094276, 2.777567932, 3.425210017, 4.127676488, 4.886675562, 5.738955394, 6.734782583, 7.883056018, 9.186093582, 10.642914445, 12.264202625, 14.053029461, 16, 16, 16, 16], degree=3))
            Line((8.846084255, 6.005609175), (8.847992308, 5.892398037))
            Line((8.847992308, 5.892398037), (8.847992308, 4.953))
            Line((8.847992308, 4.953), (8.278120513, 4.953))
            Line((8.278120513, 4.953), (8.278120513, 7.273192308))
        make_face()
        with Locations((10.028441026, 6.581205128)):
            Rectangle(SKETCH3_W, SKETCH3_H)
    extrude(amount=BOSS_EXTRUDE3_DEPTH)


solid = part.part
